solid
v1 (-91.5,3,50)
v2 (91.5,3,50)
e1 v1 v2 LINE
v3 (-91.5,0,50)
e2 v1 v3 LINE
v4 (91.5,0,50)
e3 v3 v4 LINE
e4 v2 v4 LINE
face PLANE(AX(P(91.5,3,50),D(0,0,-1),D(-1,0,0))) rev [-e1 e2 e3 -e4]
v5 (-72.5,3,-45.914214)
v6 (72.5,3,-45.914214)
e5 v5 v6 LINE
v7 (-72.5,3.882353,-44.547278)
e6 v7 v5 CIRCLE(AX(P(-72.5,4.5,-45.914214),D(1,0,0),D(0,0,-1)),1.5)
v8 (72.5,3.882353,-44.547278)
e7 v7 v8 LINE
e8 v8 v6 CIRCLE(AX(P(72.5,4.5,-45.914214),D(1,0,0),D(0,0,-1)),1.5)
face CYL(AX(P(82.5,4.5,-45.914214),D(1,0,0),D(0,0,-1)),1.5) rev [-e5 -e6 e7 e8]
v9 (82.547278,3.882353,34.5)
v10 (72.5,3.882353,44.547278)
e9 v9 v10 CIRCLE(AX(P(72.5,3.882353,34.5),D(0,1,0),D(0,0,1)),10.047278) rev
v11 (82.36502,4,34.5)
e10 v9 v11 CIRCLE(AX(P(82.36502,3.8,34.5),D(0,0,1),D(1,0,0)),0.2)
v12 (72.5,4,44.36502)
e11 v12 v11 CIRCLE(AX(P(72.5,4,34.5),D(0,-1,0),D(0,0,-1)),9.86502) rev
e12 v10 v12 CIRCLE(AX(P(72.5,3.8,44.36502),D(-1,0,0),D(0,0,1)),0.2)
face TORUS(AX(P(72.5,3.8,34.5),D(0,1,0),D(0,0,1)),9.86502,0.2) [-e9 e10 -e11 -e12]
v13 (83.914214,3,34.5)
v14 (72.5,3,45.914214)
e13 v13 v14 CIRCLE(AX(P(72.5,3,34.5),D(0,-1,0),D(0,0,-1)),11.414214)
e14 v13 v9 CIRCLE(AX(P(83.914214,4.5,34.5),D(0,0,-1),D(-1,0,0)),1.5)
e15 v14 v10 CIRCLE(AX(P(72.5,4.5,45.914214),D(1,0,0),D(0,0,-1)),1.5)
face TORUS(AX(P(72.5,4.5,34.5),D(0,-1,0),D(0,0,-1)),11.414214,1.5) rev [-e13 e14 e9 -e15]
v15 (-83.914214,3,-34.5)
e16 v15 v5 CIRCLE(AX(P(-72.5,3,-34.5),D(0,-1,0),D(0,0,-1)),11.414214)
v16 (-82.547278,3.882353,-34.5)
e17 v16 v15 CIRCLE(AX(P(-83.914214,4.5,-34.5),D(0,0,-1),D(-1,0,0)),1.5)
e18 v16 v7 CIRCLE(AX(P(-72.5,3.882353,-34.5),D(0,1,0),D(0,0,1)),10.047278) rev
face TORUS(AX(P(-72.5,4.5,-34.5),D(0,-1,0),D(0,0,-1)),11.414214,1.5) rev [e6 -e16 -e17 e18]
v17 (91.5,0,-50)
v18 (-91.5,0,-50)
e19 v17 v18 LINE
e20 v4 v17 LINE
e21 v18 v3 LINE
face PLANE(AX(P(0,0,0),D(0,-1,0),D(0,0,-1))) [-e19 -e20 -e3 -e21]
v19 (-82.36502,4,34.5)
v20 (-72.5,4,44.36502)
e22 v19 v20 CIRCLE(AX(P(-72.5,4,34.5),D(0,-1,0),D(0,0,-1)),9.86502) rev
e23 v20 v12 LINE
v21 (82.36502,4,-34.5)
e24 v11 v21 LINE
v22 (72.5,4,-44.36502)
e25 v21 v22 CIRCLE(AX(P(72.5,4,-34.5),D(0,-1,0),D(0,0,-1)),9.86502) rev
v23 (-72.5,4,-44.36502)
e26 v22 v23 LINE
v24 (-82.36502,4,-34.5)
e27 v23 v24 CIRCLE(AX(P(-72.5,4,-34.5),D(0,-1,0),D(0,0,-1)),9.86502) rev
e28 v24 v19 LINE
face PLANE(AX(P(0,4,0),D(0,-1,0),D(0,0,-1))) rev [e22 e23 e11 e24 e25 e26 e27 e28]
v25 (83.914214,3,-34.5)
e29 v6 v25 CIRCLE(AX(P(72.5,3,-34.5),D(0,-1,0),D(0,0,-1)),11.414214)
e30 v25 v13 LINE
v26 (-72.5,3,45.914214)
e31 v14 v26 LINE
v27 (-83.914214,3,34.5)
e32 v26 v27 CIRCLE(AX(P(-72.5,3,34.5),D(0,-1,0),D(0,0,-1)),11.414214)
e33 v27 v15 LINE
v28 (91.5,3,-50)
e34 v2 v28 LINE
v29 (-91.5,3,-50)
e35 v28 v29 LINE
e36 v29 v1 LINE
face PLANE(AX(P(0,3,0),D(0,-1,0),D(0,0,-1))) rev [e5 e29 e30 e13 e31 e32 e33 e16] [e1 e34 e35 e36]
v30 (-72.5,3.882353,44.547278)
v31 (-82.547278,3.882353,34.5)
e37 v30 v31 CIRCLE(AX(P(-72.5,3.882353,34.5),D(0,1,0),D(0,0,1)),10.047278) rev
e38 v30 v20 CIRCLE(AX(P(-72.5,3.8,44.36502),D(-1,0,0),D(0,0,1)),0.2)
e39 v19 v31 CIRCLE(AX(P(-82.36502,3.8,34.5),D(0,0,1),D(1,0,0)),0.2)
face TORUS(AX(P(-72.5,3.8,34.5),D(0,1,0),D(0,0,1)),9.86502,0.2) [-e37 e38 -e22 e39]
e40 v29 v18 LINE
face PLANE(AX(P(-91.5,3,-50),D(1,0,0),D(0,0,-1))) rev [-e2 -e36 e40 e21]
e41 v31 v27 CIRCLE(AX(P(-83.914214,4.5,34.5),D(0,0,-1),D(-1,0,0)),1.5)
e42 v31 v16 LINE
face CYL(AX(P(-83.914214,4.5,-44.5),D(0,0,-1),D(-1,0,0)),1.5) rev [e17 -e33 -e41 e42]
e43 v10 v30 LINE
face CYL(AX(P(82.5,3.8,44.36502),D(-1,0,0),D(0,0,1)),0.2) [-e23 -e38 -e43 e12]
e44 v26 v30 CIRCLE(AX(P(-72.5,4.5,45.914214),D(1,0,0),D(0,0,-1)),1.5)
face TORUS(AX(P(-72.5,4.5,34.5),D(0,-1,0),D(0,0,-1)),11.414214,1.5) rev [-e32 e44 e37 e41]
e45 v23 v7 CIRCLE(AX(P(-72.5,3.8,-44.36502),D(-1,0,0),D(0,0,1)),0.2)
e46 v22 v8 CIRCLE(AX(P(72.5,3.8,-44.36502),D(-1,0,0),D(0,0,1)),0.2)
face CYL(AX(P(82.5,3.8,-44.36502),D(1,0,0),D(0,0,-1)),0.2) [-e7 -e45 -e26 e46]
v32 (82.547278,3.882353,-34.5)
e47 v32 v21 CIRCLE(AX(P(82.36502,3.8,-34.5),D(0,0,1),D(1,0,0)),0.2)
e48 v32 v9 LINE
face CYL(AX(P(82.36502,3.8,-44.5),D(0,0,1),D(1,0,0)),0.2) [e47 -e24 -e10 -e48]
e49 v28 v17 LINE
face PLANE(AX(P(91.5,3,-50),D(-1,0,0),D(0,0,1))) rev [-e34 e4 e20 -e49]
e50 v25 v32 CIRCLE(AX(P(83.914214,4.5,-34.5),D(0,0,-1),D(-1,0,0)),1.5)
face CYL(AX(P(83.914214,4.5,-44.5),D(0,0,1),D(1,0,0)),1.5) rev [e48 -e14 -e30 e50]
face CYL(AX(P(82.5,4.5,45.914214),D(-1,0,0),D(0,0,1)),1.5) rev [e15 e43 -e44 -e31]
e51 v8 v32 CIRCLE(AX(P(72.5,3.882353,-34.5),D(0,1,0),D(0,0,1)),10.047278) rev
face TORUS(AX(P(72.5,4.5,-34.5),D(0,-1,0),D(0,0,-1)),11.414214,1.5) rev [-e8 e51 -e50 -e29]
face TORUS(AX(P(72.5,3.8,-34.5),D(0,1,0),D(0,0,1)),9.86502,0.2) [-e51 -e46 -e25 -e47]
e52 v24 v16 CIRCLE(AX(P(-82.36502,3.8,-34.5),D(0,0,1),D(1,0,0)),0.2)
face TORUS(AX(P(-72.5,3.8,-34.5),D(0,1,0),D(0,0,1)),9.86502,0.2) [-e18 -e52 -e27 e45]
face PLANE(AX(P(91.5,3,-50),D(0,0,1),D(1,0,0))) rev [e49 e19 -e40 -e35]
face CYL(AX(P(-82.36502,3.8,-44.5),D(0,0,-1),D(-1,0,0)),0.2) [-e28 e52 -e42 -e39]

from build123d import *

# Parameters (mm, degrees)
SKETCH_1_W      = 183
SKETCH_1_H      = 100
EXTRUDE_1_DEPTH = 3
SKETCH_2_W      = 165
SKETCH_2_H      = 89
EXTRUDE_2_DEPTH = 1
FILLET_1_R      = 10
FILLET_2_R      = 1.5
FILLET_3_R      = 0.2


with BuildPart() as part:
    # 草图1 → 凸台-拉伸1 (new body)
    with BuildSketch(Plane(origin=(0, 0, 0), x_dir=(1, 0, 0), z_dir=(0, 1, 0))):
        Rectangle(SKETCH_1_W, SKETCH_1_H)
    extrude(amount=EXTRUDE_1_DEPTH)

    # 草图2 → 凸台-拉伸2 (add)
    with BuildSketch(Plane(origin=(0, 3, 0), x_dir=(1, 0, 0), z_dir=(0, 1, 0))):
        Rectangle(SKETCH_2_W, SKETCH_2_H)
    extrude(amount=EXTRUDE_2_DEPTH)

    # 圆角1
    fillet_1_edges = [part.edges().sort_by_distance(p)[0] for p in [
        (-82.5, 3.5, -44.5),
        (-82.5, 3.5, 44.5),
        (82.5, 3.5, 44.5),
        (82.5, 3.5, -44.5),
    ]]
    fillet(fillet_1_edges, radius=FILLET_1_R)

    # 圆角2
    # the kernel refuses this fillet: 1.5 mm, written as the material it adds along each edge
    with BuildSketch(Plane(origin=(-72.5, 3, 34.5), x_dir=(-1, 0, 0), z_dir=(0, 0, -1))) as fillet_2_piece_1:
        with BuildLine():
            CenterArc((11.414213562, 1.5), FILLET_2_R, 199.471220634, 70.528779366)
            Line((10, 1), (9.971715729, 0.99))
            ThreePointArc((9.971715729, 0.99), (9.97, 0.5), (9.97, 0))
            Line((9.97, 0), (10, -0.03))
            Line((10, -0.03), (11.414213562, -0.03))
            Line((11.414213562, -0.03), (11.414213562, 0))
        make_face()
    revolve(axis=Axis((-72.5, 3, 34.5), (0, 1, 0)), revolution_arc=90)
    with BuildSketch(Plane(origin=(-82.5, 3, -34.5), x_dir=(-1, 0, 0), z_dir=(0, 0, 1)), Plane(origin=(82.5, 3, 34.5), x_dir=(1, 0, 0), z_dir=(0, 0, -1))) as fillet_2_piece_2:
        with BuildLine():
            CenterArc((1.414213562, -1.5), FILLET_2_R, 90, 70.528779366)
            Line((0, -1), (-0.028284271, -0.99))
            ThreePointArc((-0.028284271, -0.99), (-0.03, -0.5), (-0.03, 0))
            Line((-0.03, 0), (0, 0.03))
            Line((0, 0.03), (1.414213562, 0.03))
            Line((1.414213562, 0.03), (1.414213562, 0))
        make_face()
    extrude(amount=69)
    with BuildSketch(Plane(origin=(-72.5, 3, -34.5), x_dir=(0, 0, -1), z_dir=(1, 0, 0))) as fillet_2_piece_3:
        with BuildLine():
            CenterArc((11.414213562, 1.5), FILLET_2_R, 199.471220634, 70.528779366)
            Line((10, 1), (9.971715729, 0.99))
            ThreePointArc((9.971715729, 0.99), (9.97, 0.5), (9.97, 0))
            Line((9.97, 0), (10, -0.03))
            Line((10, -0.03), (11.414213562, -0.03))
            Line((11.414213562, -0.03), (11.414213562, 0))
        make_face()
    revolve(axis=Axis((-72.5, 3, -34.5), (0, 1, 0)), revolution_arc=90)
    with BuildSketch(Plane(origin=(72.5, 3, -44.5), x_dir=(0, 0, -1), z_dir=(-1, 0, 0)), Plane(origin=(-72.5, 3, 44.5), x_dir=(0, 0, 1), z_dir=(1, 0, 0))) as fillet_2_piece_4:
        with BuildLine():
            CenterArc((1.414213562, -1.5), FILLET_2_R, 90, 70.528779366)
            Line((0, -1), (-0.028284271, -0.99))
            ThreePointArc((-0.028284271, -0.99), (-0.03, -0.5), (-0.03, 0))
            Line((-0.03, 0), (0, 0.03))
            Line((0, 0.03), (1.414213562, 0.03))
            Line((1.414213562, 0.03), (1.414213562, 0))
        make_face()
    extrude(amount=145)
    with BuildSketch(Plane(origin=(72.5, 3, -34.5), x_dir=(0, 0, -1), z_dir=(-1, 0, 0))) as fillet_2_piece_5:
        with BuildLine():
            CenterArc((11.414213562, -1.5), FILLET_2_R, 90, 70.528779366)
            Line((10, -1), (9.971715729, -0.99))
            ThreePointArc((9.971715729, -0.99), (9.97, -0.5), (9.97, 0))
            Line((9.97, 0), (10, 0.03))
            Line((10, 0.03), (11.414213562, 0.03))
            Line((11.414213562, 0.03), (11.414213562, 0))
        make_face()
    revolve(axis=Axis((72.5, 3, -34.5), (0, -1, 0)), revolution_arc=90)
    with BuildSketch(Plane(origin=(72.5, 3, 34.5), x_dir=(0, 0, 1), z_dir=(-1, 0, 0))) as fillet_2_piece_6:
        with BuildLine():
            CenterArc((11.414213562, 1.5), FILLET_2_R, 199.471220634, 70.528779366)
            Line((10, 1), (9.971715729, 0.99))
            ThreePointArc((9.971715729, 0.99), (9.97, 0.5), (9.97, 0))
            Line((9.97, 0), (10, -0.03))
            Line((10, -0.03), (11.414213562, -0.03))
            Line((11.414213562, -0.03), (11.414213562, 0))
        make_face()
    revolve(axis=Axis((72.5, 3, 34.5), (0, 1, 0)), revolution_arc=90)

    # 圆角3
    fillet_3_edges = [part.edges().sort_by_distance(p)[0] for p in [
        (-82.5, 4, 0),
        (0, 4, -44.5),
        (0, 4, 44.5),
        (82.5, 4, 0),
        (-79.571067812, 4, 41.571067812),
        (79.571067812, 4, 41.571067812),
        (79.571067812, 4, -41.571067812),
        (-79.571067812, 4, -41.571067812),
    ]]
    fillet(fillet_3_edges, radius=FILLET_3_R)


solid = part.part
